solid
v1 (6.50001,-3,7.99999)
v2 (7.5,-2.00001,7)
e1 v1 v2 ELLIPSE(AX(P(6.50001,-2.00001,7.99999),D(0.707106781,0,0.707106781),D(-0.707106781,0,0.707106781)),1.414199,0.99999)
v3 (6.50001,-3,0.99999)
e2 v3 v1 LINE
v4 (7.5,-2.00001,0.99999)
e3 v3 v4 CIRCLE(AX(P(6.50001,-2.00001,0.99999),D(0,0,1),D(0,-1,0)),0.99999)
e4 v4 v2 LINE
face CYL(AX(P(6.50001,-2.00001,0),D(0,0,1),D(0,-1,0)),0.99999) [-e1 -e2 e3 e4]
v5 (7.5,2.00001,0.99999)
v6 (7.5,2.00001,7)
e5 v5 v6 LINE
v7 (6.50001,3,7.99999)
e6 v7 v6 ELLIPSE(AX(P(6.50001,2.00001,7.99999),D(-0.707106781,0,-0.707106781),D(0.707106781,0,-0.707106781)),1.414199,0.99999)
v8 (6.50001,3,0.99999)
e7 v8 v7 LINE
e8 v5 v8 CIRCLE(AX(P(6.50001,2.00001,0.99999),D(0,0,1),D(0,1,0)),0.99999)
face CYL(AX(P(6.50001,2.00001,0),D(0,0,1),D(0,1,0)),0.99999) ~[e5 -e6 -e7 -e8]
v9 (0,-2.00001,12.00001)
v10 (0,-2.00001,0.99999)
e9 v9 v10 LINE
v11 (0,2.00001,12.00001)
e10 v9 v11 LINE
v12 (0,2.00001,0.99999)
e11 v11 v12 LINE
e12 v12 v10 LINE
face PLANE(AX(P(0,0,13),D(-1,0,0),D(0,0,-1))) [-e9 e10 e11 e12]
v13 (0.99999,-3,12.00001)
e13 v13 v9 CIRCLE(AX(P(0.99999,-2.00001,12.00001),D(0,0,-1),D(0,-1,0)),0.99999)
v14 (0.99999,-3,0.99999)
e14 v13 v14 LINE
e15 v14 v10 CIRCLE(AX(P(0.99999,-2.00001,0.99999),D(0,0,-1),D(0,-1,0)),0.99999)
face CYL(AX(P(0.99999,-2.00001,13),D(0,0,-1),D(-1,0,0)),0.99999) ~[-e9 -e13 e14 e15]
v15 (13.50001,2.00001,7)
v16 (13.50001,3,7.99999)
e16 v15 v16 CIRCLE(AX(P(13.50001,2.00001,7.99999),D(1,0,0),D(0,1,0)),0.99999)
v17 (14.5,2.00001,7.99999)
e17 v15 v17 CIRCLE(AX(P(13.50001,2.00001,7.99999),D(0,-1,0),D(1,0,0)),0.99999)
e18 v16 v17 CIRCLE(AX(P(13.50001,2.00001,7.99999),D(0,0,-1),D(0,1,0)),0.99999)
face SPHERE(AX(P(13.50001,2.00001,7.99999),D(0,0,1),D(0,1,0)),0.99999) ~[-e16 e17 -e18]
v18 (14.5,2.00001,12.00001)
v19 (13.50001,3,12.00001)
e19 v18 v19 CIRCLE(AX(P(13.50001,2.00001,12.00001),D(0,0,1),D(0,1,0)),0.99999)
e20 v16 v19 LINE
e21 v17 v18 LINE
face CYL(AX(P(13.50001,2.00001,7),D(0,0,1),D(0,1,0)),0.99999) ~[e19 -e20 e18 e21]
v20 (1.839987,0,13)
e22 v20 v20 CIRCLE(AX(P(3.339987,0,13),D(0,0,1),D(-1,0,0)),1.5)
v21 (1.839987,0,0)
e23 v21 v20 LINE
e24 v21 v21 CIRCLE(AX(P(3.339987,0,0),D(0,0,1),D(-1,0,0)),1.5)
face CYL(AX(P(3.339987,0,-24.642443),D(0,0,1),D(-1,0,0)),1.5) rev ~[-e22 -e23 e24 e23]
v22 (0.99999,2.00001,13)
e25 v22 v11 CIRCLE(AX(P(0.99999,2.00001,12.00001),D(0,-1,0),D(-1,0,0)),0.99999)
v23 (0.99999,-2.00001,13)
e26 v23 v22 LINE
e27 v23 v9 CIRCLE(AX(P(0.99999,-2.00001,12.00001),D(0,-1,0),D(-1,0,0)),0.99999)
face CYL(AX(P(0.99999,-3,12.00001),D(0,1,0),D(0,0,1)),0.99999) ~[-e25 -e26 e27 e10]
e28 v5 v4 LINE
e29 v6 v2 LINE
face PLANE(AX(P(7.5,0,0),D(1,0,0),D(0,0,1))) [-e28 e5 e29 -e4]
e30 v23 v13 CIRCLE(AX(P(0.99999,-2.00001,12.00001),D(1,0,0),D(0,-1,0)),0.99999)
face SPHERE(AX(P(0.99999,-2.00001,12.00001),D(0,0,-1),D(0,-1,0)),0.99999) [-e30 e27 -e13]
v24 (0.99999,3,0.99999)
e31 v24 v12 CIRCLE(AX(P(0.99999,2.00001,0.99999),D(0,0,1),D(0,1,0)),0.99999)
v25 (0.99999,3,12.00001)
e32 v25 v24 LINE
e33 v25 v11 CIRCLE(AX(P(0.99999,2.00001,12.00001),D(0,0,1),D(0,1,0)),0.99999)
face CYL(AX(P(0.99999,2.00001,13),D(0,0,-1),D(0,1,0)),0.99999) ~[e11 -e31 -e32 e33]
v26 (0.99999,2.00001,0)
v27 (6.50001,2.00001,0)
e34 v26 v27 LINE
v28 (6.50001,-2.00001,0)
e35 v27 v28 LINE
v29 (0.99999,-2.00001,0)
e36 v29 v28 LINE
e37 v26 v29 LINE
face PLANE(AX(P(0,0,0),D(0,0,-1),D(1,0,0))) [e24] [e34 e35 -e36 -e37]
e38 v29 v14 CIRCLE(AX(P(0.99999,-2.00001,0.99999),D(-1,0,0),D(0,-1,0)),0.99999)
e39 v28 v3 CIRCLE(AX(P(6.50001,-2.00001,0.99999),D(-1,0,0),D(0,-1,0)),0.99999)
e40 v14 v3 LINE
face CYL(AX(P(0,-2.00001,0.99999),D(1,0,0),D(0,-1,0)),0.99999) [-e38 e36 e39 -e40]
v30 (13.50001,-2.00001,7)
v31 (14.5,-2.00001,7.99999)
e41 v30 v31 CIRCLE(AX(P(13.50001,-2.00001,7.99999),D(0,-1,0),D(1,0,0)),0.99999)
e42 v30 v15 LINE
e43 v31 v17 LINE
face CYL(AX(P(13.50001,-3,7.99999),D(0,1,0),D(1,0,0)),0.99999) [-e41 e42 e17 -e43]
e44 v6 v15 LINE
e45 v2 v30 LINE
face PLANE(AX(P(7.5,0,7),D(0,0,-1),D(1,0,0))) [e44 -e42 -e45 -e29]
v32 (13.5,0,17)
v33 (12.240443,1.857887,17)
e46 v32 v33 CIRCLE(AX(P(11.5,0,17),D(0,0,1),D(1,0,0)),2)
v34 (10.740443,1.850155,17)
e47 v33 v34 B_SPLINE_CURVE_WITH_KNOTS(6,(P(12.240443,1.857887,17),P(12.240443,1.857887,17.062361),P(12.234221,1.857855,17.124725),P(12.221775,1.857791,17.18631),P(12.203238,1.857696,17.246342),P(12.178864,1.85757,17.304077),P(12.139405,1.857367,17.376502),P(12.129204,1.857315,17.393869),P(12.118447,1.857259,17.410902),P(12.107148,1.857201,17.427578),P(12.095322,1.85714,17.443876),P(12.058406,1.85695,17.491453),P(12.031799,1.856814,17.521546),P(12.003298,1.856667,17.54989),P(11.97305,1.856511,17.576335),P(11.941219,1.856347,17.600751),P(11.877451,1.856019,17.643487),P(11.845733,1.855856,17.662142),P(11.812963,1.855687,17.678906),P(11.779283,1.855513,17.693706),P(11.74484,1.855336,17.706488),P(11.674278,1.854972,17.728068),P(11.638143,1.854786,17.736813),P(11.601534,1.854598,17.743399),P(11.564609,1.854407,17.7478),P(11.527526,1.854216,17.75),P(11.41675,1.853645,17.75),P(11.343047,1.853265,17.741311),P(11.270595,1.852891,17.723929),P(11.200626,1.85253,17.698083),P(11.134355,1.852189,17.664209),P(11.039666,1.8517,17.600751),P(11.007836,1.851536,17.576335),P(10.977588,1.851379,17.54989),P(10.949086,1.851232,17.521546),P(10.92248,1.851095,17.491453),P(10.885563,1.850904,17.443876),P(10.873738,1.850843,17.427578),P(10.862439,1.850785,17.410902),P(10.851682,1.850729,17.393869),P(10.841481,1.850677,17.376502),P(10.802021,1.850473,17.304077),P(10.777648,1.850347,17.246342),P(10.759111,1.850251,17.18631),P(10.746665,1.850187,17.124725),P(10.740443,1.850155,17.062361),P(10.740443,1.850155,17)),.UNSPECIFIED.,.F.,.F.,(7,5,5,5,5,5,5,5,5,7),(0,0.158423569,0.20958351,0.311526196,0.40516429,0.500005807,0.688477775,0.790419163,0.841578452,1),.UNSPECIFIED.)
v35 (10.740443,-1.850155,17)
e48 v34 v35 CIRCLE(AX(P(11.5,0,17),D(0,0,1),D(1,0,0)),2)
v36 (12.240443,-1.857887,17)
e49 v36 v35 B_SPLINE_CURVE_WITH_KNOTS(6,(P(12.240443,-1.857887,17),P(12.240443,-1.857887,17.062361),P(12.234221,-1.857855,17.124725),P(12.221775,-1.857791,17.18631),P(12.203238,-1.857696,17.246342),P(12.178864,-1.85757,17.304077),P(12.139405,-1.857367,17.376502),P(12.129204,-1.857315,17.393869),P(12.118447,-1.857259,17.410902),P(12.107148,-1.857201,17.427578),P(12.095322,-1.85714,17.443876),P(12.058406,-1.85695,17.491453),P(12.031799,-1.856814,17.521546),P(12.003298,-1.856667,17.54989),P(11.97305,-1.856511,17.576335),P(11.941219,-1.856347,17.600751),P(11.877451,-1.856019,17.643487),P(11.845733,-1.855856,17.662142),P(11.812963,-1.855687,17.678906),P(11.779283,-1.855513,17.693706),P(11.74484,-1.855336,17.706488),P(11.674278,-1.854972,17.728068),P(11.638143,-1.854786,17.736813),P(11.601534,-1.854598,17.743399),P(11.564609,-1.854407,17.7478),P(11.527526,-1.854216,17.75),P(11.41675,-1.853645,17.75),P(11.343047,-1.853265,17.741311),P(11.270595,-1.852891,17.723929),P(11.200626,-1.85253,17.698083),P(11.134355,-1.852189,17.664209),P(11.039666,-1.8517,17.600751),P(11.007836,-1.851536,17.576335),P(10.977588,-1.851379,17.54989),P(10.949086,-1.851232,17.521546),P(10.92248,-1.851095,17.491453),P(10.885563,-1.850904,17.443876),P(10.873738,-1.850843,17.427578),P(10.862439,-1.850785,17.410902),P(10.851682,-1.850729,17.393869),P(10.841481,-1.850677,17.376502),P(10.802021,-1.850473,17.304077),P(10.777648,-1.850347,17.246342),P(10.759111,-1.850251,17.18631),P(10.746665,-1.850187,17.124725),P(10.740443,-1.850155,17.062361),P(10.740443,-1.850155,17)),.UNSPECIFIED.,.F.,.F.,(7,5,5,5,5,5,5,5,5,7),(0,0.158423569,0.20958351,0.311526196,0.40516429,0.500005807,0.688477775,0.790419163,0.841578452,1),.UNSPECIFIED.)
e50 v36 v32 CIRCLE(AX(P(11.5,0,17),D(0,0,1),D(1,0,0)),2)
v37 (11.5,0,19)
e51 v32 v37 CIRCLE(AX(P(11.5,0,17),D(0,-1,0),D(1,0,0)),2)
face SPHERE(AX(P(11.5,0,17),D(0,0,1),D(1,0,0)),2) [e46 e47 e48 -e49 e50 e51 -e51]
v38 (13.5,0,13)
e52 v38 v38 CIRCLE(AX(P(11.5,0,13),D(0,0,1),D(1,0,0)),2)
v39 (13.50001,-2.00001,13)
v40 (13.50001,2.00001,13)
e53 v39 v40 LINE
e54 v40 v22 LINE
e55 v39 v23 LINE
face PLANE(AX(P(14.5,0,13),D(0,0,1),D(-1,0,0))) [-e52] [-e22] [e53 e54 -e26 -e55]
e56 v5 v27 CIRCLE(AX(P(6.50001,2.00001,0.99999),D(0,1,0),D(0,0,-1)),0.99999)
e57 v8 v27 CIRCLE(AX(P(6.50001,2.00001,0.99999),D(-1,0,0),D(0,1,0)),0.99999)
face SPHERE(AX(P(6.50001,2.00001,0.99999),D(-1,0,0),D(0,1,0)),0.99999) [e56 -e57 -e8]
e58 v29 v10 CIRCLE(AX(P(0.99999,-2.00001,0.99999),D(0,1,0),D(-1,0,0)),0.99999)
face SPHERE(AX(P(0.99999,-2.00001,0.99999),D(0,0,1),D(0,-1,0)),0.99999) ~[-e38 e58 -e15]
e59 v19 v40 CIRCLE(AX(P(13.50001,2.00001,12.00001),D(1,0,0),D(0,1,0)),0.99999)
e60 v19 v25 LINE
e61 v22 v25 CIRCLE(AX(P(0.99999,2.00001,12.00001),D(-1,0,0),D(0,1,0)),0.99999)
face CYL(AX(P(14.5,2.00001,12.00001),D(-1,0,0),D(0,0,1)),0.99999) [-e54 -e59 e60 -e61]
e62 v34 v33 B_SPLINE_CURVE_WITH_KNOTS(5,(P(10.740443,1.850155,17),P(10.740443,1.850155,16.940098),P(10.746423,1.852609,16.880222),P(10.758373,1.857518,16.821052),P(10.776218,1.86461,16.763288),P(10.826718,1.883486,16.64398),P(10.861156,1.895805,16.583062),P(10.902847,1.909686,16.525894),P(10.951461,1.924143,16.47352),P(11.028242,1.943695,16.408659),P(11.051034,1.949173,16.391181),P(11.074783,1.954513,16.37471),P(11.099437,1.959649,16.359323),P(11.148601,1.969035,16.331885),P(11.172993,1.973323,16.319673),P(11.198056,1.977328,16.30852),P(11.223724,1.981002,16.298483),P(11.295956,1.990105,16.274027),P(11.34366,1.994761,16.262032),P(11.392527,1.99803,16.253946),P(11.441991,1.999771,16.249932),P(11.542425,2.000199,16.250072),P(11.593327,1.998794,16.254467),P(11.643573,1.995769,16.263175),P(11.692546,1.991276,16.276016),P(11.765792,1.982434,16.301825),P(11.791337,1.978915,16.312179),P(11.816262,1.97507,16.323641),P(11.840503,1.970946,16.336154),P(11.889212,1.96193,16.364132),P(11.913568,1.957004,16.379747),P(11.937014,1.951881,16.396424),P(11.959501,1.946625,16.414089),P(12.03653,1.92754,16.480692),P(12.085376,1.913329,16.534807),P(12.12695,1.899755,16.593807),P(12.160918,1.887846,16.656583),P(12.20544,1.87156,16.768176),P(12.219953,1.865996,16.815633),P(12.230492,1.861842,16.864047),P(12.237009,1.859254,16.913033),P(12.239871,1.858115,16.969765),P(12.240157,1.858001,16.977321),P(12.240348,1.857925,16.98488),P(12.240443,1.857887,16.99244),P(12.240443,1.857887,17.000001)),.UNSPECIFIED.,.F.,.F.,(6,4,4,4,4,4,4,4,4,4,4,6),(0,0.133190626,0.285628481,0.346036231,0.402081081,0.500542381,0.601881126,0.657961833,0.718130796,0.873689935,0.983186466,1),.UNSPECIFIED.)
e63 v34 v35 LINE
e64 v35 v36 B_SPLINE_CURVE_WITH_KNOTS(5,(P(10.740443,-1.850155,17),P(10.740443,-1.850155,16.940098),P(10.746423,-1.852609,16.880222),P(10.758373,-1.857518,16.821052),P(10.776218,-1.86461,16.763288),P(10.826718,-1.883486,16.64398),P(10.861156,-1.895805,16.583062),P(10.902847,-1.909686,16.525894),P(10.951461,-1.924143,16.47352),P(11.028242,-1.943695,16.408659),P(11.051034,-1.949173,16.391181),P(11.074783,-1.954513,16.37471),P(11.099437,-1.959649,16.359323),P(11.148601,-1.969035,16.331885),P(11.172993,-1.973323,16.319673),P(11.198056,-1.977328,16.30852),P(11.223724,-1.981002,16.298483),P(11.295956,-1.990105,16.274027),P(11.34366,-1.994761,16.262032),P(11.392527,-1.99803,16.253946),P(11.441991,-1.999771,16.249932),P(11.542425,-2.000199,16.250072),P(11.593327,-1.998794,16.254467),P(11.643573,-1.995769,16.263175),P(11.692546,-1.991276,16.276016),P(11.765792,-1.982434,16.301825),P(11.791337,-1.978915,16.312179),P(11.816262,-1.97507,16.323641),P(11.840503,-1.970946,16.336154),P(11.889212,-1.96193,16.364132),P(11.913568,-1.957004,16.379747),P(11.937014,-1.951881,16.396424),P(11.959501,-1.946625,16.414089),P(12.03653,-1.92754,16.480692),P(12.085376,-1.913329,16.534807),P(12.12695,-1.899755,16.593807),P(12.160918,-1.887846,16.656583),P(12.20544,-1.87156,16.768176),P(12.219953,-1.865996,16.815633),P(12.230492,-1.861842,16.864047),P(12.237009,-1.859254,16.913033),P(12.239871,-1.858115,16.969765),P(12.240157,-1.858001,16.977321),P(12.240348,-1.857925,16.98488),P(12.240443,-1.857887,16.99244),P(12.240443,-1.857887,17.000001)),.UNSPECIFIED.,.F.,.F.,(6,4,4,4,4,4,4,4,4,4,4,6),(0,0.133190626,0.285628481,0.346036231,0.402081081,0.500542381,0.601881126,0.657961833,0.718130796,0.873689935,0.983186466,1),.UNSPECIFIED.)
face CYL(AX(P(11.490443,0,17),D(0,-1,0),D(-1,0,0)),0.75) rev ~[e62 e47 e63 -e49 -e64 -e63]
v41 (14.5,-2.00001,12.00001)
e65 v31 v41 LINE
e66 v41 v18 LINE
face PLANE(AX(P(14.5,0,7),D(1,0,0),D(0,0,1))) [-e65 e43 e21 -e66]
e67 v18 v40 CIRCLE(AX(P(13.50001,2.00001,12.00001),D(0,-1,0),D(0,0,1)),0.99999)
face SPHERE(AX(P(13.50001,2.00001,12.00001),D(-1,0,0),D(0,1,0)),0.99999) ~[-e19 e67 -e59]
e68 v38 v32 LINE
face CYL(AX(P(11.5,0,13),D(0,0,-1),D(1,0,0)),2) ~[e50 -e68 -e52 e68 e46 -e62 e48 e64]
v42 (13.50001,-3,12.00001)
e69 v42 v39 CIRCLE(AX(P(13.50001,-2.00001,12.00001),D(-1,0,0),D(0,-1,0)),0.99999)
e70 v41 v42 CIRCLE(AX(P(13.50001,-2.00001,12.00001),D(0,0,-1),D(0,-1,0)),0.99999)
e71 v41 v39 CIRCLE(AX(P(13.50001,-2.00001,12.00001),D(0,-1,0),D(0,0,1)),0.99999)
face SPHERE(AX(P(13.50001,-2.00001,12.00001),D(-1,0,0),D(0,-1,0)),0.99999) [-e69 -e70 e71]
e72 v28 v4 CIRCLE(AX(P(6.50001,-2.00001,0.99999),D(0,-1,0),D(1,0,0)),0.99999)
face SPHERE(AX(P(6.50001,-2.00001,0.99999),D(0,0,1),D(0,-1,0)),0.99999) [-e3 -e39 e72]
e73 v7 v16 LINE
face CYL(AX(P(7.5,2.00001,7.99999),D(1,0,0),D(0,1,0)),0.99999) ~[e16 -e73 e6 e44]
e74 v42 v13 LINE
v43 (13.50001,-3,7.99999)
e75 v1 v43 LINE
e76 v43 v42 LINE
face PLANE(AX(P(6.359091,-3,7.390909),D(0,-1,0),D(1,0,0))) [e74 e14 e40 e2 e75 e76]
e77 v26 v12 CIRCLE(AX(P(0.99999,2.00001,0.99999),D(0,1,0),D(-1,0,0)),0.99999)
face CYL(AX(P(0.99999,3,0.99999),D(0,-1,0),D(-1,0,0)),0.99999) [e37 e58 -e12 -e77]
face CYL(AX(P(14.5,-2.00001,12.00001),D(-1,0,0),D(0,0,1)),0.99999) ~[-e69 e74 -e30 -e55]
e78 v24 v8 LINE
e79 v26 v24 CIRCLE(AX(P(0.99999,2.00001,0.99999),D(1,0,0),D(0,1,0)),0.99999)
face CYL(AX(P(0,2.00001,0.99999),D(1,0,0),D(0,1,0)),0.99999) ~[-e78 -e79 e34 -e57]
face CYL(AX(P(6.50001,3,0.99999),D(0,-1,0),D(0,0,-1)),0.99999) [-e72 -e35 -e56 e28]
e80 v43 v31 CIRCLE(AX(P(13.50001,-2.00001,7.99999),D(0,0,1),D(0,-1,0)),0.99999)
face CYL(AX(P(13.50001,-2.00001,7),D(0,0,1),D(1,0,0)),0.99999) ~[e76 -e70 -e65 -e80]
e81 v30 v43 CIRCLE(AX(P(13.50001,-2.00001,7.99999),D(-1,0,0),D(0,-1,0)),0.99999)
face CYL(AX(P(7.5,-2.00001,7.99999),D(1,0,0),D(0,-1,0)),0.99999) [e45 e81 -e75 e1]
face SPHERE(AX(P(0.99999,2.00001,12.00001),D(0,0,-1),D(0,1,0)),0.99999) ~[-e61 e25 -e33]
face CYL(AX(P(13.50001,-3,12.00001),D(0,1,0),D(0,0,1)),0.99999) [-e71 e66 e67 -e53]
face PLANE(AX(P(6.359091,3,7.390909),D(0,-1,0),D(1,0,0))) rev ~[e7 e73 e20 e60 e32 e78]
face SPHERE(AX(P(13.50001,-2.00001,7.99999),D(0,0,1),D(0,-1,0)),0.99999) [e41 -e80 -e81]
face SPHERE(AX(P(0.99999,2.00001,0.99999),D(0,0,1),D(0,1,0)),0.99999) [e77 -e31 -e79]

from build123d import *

# Parameters (mm, degrees)
F1_DEPTH = 3
F2_R     = 2
F3_DEPTH = 6
F4_R     = 2
F6_DEPTH = 12.5
F8_D     = 3
F9_R     = 0.99999


# Not quite as in the source:
# - a fillet or chamfer is up to 0.001 mm smaller than in the source, because OpenCascade refuses the exact size


with BuildPart() as f1:
    # F0 (on Front) → F1 (new body, symmetric)
    with BuildSketch(Plane.XZ):
        Polygon((0, 13), (0, 0), (7.5, 0), (7.5, 7), (14.5, 7), (14.5, 13), align=None)
    extrude(amount=F1_DEPTH, both=True)

    # F2 (on face) → F3 (join)
    with BuildSketch(Plane.XY.offset(13)):
        with Locations((11.5, 0)):
            Circle(F2_R)
    extrude(amount=F3_DEPTH)

    # F4
    f4_edges = [f1.edges().sort_by_distance(p)[0] for p in [
        (9.5, 0, 19),
    ]]
    fillet(f4_edges, radius=F4_R)

    # F5 (on Front) → F6 (cut, symmetric)
    with BuildSketch(Plane.XZ):
        with BuildLine():
            Line((10.7404427901, 17), (12.2404427901, 17))
            ThreePointArc((12.2404427901, 17), (11.4904427901, 17.75), (10.7404427901, 17))
        make_face()
        with BuildLine():
            ThreePointArc((10.7404427901, 17), (11.4904427901, 16.25), (12.2404427901, 17))
            Line((12.2404427901, 17), (10.7404427901, 17))
        make_face()
    extrude(amount=F6_DEPTH, both=True, mode=Mode.SUBTRACT)

    # F8 (through all)
    with Locations(Plane(origin=(0, 0, 0), x_dir=(1, 0, 0), z_dir=(0, 0, -1))):
        with Locations((3.3399870154, 0)):
            Hole(F8_D / 2)

    # F9 (radius 1 in the source; OpenCascade refuses exactly that, so slightly less here)
    f9_edges = [f1.edges().sort_by_distance(p)[0] for p in [
        (0, 3, 6.5),
        (7.25, 3, 13),
        (14.5, 3, 10),
        (11, 3, 7),
        (3.75, 3, 0),
        (7.5, 3, 3.5),
        (0, -3, 6.5),
        (7.5, -3, 3.5),
        (3.75, -3, 0),
        (7.25, -3, 13),
        (14.5, -3, 10),
        (0, 0, 13),
        (0, 0, 0),
        (7.5, 0, 0),
        (11, -3, 7),
        (14.5, 0, 13),
        (14.5, 0, 7),
    ]]
    fillet(f9_edges, radius=F9_R)


solid = f1.part
